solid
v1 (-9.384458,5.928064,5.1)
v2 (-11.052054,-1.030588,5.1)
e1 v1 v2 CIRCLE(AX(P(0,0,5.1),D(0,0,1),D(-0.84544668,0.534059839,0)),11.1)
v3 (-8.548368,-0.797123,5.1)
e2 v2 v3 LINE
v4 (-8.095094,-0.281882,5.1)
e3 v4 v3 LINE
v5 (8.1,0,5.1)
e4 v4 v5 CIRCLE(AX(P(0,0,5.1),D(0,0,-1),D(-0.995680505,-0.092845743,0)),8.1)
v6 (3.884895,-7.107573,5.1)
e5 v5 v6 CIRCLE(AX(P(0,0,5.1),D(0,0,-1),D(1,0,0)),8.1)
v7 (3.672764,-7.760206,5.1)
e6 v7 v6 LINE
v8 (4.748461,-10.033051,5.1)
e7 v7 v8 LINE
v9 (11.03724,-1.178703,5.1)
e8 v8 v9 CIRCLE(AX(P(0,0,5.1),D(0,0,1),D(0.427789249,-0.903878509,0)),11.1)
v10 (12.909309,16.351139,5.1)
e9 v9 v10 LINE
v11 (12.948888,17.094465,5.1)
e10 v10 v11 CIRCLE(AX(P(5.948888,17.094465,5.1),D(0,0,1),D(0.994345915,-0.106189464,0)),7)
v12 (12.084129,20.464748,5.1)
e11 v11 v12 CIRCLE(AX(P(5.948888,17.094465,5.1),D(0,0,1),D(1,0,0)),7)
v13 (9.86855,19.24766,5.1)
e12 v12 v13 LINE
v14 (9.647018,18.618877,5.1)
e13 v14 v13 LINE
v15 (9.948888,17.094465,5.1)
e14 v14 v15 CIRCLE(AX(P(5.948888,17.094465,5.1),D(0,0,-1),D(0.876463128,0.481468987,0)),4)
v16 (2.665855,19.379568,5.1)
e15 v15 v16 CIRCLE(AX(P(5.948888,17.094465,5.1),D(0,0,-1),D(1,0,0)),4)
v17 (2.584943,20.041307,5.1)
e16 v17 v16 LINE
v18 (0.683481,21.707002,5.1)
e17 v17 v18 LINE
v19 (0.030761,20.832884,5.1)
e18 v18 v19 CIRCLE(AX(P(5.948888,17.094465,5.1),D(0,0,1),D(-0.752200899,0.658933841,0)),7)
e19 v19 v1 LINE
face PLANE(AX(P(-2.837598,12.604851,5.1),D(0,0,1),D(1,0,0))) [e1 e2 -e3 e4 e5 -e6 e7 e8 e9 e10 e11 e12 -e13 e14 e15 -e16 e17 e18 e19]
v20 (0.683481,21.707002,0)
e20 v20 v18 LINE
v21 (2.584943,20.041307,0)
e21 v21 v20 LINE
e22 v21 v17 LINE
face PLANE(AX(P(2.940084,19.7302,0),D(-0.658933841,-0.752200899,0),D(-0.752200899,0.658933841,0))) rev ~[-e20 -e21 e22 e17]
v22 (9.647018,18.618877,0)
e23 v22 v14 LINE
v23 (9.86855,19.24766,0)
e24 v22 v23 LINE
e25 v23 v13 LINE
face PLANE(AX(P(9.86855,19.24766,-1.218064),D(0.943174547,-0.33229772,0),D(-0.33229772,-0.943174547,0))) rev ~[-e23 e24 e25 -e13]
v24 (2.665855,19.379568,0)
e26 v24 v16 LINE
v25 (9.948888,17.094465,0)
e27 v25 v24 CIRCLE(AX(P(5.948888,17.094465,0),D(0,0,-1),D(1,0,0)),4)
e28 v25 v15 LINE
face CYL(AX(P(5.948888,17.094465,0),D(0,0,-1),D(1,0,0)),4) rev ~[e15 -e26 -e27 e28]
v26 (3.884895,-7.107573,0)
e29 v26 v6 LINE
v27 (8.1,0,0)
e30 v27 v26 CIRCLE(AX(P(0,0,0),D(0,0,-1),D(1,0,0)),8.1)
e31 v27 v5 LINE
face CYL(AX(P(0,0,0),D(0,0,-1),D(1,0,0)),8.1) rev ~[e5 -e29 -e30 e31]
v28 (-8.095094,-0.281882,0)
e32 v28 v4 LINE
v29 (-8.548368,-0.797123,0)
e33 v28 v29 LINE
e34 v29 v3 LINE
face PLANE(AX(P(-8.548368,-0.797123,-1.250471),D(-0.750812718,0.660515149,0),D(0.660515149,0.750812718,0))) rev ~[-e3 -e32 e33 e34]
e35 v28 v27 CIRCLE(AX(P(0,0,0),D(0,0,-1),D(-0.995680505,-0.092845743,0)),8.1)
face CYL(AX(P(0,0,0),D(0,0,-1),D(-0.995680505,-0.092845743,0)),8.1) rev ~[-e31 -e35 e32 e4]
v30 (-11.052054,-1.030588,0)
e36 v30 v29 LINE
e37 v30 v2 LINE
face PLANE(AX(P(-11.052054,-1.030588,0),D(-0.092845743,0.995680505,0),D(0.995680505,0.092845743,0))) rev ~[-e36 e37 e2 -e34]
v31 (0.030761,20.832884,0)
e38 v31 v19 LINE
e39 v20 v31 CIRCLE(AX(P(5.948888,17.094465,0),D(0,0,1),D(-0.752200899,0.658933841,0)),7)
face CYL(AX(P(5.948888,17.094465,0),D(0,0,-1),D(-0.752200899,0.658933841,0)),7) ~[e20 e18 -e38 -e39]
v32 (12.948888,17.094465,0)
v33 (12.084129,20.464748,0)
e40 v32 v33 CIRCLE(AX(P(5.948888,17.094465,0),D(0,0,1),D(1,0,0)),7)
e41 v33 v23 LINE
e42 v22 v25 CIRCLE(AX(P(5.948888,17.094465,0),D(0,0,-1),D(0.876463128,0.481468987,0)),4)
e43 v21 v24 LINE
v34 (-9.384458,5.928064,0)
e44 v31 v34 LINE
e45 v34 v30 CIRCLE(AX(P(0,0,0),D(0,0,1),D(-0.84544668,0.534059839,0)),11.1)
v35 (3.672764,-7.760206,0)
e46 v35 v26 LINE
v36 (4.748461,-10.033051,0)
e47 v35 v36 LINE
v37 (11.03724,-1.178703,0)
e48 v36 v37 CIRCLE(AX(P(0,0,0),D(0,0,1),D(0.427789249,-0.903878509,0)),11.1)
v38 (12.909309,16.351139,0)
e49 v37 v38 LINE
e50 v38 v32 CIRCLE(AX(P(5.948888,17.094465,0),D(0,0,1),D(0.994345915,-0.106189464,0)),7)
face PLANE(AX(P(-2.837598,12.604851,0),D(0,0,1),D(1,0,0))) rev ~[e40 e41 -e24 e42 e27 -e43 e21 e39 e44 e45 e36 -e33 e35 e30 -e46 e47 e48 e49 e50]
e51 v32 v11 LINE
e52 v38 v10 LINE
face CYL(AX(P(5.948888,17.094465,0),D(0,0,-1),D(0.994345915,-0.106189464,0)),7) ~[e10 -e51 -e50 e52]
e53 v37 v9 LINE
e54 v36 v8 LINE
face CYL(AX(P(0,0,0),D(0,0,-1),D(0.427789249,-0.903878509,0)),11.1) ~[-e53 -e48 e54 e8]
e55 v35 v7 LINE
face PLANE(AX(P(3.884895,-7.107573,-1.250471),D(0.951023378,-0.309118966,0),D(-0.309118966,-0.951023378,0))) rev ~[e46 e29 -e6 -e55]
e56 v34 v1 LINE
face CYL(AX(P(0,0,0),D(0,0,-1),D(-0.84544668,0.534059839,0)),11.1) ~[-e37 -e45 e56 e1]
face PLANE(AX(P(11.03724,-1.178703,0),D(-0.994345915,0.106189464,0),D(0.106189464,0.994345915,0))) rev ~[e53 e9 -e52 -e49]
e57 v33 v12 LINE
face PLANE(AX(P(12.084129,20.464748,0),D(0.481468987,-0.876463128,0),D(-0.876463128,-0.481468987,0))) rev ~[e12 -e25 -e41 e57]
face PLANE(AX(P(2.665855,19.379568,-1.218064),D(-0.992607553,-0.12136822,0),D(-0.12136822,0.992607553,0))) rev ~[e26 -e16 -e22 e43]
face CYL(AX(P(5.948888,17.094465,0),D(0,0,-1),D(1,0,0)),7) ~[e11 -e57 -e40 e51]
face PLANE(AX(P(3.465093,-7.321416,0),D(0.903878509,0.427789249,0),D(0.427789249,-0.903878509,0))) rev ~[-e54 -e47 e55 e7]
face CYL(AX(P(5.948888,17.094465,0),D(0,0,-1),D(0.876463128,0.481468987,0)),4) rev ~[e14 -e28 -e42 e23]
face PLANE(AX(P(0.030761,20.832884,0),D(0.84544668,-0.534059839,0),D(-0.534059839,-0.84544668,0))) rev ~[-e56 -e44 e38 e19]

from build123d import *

# Parameters (mm, degrees)
F1_DEPTH    = 5.1
F2_T1_DEPTH = 7.5361277396
F2_T3_DEPTH = 7.6009429286


# Not quite as in the source:
# - a fillet or chamfer that OpenCascade refuses, or shapes differently, is made with other operations: its cross-section is extruded or revolved along the edge and cut away or added


with BuildPart() as f1:
    # F0 (on Top) → F1 (new body)
    with BuildSketch(Plane.XY):
        with BuildLine():
            Line((0.0307608464, 20.8328839523), (-9.3844581437, 5.9280642161))
            ThreePointArc((-9.3844581437, 5.9280642161), (-3.6624820561, 10.4783693955), (3.6482130412, 10.4833459165))
            ThreePointArc((3.6482130412, 10.4833459165), (-0.6590930389, 14.7847915444), (0.0307608464, 20.8328839523))
        make_face()
        with BuildLine():
            ThreePointArc((-8.0650120901, -0.752050521), (-0.3764319792, 8.0912482946), (8.1, 0))
            ThreePointArc((8.1, 0), (6.8438750945, -4.3325943371), (3.465092916, -7.3214159207))
            Line((3.465092916, -7.3214159207), (4.7484606627, -10.0330514468))
            ThreePointArc((4.7484606627, -10.0330514468), (9.0496936401, -6.4275224637), (11.0372396512, -1.1787030508))
            ThreePointArc((11.0372396512, -1.1787030508), (11.084298808, -0.5901863569), (11.1, 0))
            ThreePointArc((11.1, 0), (9.0472417, 6.4309733028), (3.6482130412, 10.4833459165))
            ThreePointArc((3.6482130412, 10.4833459165), (-3.6624820561, 10.4783693955), (-9.3844581437, 5.9280642161))
            ThreePointArc((-9.3844581437, 5.9280642161), (-10.7943717933, 2.586800647), (-11.052053605, -1.030587751))
            Line((-11.052053605, -1.030587751), (-8.0650120901, -0.752050521))
        make_face()
        with BuildLine():
            ThreePointArc((11.1, 0), (11.084298808, -0.5901863569), (11.0372396512, -1.1787030508))
            Line((11.0372396512, -1.1787030508), (12.9093090053, 16.351138829))
            ThreePointArc((12.9093090053, 16.351138829), (9.6953604205, 11.1814335847), (3.6482130412, 10.4833459165))
            ThreePointArc((3.6482130412, 10.4833459165), (9.0472417, 6.4309733028), (11.1, 0))
        make_face()
        with BuildLine():
            ThreePointArc((0.0307608464, 20.8328839523), (-0.6590930389, 14.7847915444), (3.6482130412, 10.4833459165))
            ThreePointArc((3.6482130412, 10.4833459165), (9.6953604205, 11.1814335847), (12.9093090053, 16.351138829))
            ThreePointArc((12.9093090053, 16.351138829), (12.938985951, 16.7222754829), (12.9488876036, 17.0944650773))
            ThreePointArc((12.9488876036, 17.0944650773), (12.7292523894, 18.8341930364), (12.0841294975, 20.4647479889))
            Line((12.0841294975, 20.4647479889), (9.4547401144, 19.0203410268))
            ThreePointArc((9.4547401144, 19.0203410268), (9.8233817669, 18.0885953396), (9.9488876036, 17.0944650773))
            ThreePointArc((9.9488876036, 17.0944650773), (4.5409128854, 13.3504555697), (2.9400840071, 19.730200443))
            Line((2.9400840071, 19.730200443), (0.6834813098, 21.7070019672))
            ThreePointArc((0.6834813098, 21.7070019672), (0.3400665642, 21.282677888), (0.0307608464, 20.8328839523))
        make_face()
    extrude(amount=F1_DEPTH)

    # F2: chamfer of 0.5 on 4 edges, made by hand

    # F2_s2 → F2_t1 (cut)
    with BuildSketch(Plane.XY.offset(-1.2180638698)):
        with BuildLine():
            Line((9.8685498702, 19.2476598469), (9.6470180572, 18.6188768158))
            ThreePointArc((9.6470180572, 18.6188768158), (9.5595268283, 18.8158843724), (9.4547401144, 19.0203410268))
            Line((9.4547401144, 19.0203410268), (9.8685498702, 19.2476598469))
        make_face()
        with BuildLine():
            Line((2.665855064, 19.3795684325), (2.5849429173, 20.0413068015))
            Line((2.5849429173, 20.0413068015), (2.9400840071, 19.730200443))
            ThreePointArc((2.9400840071, 19.730200443), (2.7937225781, 19.5531097571), (2.665855064, 19.3795684325))
        make_face()
    extrude(amount=F2_T1_DEPTH, mode=Mode.SUBTRACT)

    # F2_s4 → F2_t3 (cut)
    with BuildSketch(Plane.XY.offset(-1.2504714643)):
        with BuildLine():
            Line((3.8848953119, -7.1075726106), (3.6727644101, -7.7602062851))
            Line((3.6727644101, -7.7602062851), (3.465092916, -7.3214159207))
            ThreePointArc((3.465092916, -7.3214159207), (3.682856675, -7.2143306489), (3.8848953119, -7.1075726106))
        make_face()
        with BuildLine():
            Line((-8.5483679919, -0.7971227482), (-8.0950937203, -0.2818823506))
            ThreePointArc((-8.0950937203, -0.2818823506), (-8.0839209794, -0.5101192), (-8.0650120901, -0.752050521))
            Line((-8.0650120901, -0.752050521), (-8.5483679919, -0.7971227482))
        make_face()
    extrude(amount=F2_T3_DEPTH, mode=Mode.SUBTRACT)


solid = f1.part
